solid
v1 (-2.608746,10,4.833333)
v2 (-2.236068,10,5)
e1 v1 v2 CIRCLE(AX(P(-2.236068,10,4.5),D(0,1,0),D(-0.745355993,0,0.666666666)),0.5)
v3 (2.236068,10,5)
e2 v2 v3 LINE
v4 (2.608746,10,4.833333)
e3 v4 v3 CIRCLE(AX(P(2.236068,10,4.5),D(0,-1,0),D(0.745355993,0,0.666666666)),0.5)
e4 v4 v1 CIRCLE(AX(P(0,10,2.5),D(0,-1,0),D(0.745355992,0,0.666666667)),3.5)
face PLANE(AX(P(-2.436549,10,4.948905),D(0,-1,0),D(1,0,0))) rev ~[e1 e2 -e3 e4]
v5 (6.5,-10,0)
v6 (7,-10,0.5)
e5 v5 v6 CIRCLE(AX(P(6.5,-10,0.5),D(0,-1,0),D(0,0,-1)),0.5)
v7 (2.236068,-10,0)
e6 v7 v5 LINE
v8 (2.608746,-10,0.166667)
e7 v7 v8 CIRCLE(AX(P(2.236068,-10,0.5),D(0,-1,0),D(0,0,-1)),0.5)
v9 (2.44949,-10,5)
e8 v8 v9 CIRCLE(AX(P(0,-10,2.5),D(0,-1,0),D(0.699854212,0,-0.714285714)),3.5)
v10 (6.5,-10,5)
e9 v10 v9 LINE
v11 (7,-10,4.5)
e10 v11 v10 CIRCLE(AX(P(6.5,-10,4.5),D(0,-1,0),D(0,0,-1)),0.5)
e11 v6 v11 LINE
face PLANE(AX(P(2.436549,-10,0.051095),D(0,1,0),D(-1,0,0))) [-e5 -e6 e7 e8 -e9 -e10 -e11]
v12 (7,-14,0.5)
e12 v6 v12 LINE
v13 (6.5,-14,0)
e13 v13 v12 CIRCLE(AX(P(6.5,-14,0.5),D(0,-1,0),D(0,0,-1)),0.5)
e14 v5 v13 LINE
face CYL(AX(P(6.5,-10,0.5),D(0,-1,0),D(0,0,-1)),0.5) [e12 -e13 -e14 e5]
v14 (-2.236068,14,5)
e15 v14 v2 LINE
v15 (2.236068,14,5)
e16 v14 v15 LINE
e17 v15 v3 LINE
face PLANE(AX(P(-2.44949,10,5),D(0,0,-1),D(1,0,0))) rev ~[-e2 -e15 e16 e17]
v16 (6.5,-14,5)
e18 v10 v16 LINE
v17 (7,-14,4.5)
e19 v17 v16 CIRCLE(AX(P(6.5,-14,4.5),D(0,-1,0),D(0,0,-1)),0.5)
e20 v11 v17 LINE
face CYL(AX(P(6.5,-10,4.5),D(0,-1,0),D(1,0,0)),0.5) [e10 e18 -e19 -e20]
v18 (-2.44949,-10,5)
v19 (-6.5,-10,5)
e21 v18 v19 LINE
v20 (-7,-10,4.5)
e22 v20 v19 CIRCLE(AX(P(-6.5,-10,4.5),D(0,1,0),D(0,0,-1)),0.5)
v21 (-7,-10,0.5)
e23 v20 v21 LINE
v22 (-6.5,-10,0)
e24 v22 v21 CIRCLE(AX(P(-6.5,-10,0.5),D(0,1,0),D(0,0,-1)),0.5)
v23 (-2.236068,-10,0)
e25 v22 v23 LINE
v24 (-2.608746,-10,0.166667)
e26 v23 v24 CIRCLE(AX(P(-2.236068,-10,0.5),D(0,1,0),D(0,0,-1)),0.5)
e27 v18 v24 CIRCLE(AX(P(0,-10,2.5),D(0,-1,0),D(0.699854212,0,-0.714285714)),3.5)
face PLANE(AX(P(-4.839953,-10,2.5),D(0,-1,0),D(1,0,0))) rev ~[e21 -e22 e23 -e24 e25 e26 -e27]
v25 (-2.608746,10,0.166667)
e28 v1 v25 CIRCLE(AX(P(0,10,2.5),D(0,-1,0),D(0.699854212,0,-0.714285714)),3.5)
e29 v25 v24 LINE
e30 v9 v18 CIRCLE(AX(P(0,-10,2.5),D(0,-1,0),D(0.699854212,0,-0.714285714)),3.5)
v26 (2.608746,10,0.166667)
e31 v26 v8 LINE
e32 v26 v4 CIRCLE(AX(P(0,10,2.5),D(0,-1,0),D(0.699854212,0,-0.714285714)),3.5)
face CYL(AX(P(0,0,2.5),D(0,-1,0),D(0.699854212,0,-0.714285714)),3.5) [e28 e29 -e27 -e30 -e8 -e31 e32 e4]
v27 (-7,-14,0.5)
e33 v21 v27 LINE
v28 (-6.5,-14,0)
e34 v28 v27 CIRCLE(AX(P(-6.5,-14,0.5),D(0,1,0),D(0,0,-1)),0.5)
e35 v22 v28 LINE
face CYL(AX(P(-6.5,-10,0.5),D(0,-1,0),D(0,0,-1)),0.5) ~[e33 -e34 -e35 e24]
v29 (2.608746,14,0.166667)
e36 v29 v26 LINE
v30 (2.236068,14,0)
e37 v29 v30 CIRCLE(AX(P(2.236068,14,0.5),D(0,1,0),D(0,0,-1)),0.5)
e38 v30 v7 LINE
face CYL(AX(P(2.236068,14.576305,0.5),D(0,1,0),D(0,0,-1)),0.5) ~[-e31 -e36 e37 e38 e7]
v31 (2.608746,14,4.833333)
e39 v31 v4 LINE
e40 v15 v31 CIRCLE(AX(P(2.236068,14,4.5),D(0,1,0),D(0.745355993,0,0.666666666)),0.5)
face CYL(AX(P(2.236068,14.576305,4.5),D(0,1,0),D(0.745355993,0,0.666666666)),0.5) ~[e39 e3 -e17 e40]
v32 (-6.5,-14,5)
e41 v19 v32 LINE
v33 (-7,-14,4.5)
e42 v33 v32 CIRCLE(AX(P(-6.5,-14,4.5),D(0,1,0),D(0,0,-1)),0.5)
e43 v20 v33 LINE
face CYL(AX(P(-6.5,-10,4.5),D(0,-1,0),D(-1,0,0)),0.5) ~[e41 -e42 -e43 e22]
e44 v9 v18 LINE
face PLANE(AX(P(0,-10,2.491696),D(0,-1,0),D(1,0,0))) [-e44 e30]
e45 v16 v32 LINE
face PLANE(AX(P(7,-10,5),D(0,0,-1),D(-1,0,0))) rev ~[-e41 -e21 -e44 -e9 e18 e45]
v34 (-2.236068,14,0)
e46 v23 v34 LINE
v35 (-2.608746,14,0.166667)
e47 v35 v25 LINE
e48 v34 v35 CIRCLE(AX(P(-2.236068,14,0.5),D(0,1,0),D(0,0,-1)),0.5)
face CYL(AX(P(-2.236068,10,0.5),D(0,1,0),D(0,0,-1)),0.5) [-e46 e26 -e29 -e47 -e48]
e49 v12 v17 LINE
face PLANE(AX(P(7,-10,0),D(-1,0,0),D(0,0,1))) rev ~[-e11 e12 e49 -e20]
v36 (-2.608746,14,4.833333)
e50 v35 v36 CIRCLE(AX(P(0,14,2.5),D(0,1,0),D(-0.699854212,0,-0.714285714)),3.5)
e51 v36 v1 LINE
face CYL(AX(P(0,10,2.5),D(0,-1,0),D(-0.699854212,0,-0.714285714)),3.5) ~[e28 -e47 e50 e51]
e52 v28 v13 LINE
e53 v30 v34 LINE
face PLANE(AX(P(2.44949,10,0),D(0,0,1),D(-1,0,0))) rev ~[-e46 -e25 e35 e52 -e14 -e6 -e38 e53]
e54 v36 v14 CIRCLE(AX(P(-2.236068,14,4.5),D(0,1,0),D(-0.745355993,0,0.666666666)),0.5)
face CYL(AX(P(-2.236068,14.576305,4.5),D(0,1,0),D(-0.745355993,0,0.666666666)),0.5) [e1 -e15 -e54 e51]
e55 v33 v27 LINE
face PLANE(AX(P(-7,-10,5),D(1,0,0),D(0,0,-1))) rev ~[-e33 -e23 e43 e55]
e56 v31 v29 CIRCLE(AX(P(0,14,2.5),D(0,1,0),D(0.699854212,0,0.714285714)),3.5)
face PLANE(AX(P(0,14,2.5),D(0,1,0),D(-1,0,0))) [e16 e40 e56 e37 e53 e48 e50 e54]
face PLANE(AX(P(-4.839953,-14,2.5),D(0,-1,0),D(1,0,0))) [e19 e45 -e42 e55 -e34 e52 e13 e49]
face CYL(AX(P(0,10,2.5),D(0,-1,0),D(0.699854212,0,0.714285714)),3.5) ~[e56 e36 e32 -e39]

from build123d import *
from build123d import SkipClean  # not in build123d's __all__

# Parameters (mm, degrees)
F1_DEPTH    = 10
F3_DEPTH    = 4
F5_DEPTH    = 4
F6_R        = 0.5
F7_T1_DEPTH = 20
F7_T3_DEPTH = 4.5763046334


# Not quite as in the source:
# - a fillet or chamfer that OpenCascade refuses, or shapes differently, is made with other operations: its cross-section is extruded or revolved along the edge and cut away or added


with BuildPart() as f1:
    # F0 (on Front) → F1 (new body, symmetric)
    with BuildSketch(Plane.XZ):
        with BuildLine():
            Line((-2.4494897428, 0), (2.4494897428, 0))
            ThreePointArc((2.4494897428, 0), (0, 6), (-2.4494897428, 0))
        make_face()
    extrude(amount=F1_DEPTH, both=True)

    # F2 (on face) → F3 (join)
    with BuildSketch(Plane.XZ.offset(10)):
        with BuildLine():
            Line((-2.4494897428, 5), (-7, 5))
            Line((-7, 5), (-7, 0))
            Line((-7, 0), (-2.4494897428, 0))
            ThreePointArc((-2.4494897428, 0), (-3.5, 2.5), (-2.4494897428, 5))
        make_face()
        with BuildLine():
            Line((2.4494897428, 5), (-2.4494897428, 5))
            ThreePointArc((-2.4494897428, 5), (-3.5, 2.5), (-2.4494897428, 0))
            Line((-2.4494897428, 0), (2.4494897428, 0))
            ThreePointArc((2.4494897428, 0), (3.5, 2.5), (2.4494897428, 5))
        make_face()
        with BuildLine():
            Line((7, 5), (2.4494897428, 5))
            ThreePointArc((2.4494897428, 5), (3.5, 2.5), (2.4494897428, 0))
            Line((2.4494897428, 0), (7, 0))
            Line((7, 0), (7, 5))
        make_face()
    extrude(amount=F3_DEPTH)

    # F4 (on face) → F5 (join)
    with BuildSketch(Plane(origin=(0, 10, 0), x_dir=(-1, 0, 0), z_dir=(0, 1, 0))):
        with BuildLine():
            ThreePointArc((-2.4494897428, 5), (-3.5, 2.5), (-2.4494897428, 0))
            Line((-2.4494897428, 0), (2.4494897428, 0))
            ThreePointArc((2.4494897428, 0), (3.5, 2.5), (2.4494897428, 5))
            Line((2.4494897428, 5), (-2.4494897428, 5))
        make_face()
    extrude(amount=F5_DEPTH)

    # F6
    f6_edges = [f1.edges().sort_by_distance(p)[0] for p in [
        (7, -12, 5),
        (7, -12, 0),
        (-7, -12, 5),
        (-7, -12, 0),
    ]]
    fillet(f6_edges, radius=F6_R)

    # F7: fillet of radius 0.5 on 6 edges, made by hand

    # F7_s2 → F7_t1 (cut)
    with BuildSketch(Plane.XZ.offset(-10)):
        with BuildLine():
            ThreePointArc((2.2360679775, 0), (2.4401921227, 0.0435645354), (2.6087459737, 0.1666666667))
            ThreePointArc((2.6087459737, 0.1666666667), (2.5304903844, 0.0820218333), (2.4494897428, 0))
            Line((2.4494897428, 0), (2.2360679775, 0))
        make_face()
        with BuildLine():
            ThreePointArc((-2.2360679775, 0), (-2.4401921227, 0.0435645354), (-2.6087459737, 0.1666666667))
            ThreePointArc((-2.6087459737, 0.1666666667), (-2.5304903844, 0.0820218333), (-2.4494897428, 0))
            Line((-2.4494897428, 0), (-2.2360679775, 0))
        make_face()
    with SkipClean():  # cleaning this boolean's faces spoils the solid; the shape is the same uncleaned
        extrude(amount=F7_T1_DEPTH, mode=Mode.SUBTRACT)

    # F7_s4 → F7_t3 (cut)
    with BuildSketch(Plane.XZ.offset(-14.5763046334)):
        with BuildLine():
            ThreePointArc((2.2360679775, 0), (2.4401921227, 0.0435645354), (2.6087459737, 0.1666666667))
            ThreePointArc((2.6087459737, 0.1666666667), (2.5304903844, 0.0820218333), (2.4494897428, 0))
            Line((2.4494897428, 0), (2.2360679775, 0))
        make_face()
        with BuildLine():
            ThreePointArc((-2.2360679775, 0), (-2.4401921227, 0.0435645354), (-2.6087459737, 0.1666666667))
            ThreePointArc((-2.6087459737, 0.1666666667), (-2.5304903844, 0.0820218333), (-2.4494897428, 0))
            Line((-2.4494897428, 0), (-2.2360679775, 0))
        make_face()
        with BuildLine():
            ThreePointArc((2.6087459737, 4.8333333333), (2.4401921227, 4.9564354646), (2.2360679775, 5))
            Line((2.2360679775, 5), (2.4494897428, 5))
            ThreePointArc((2.4494897428, 5), (2.5304903844, 4.9179781667), (2.6087459737, 4.8333333333))
        make_face()
        with BuildLine():
            ThreePointArc((-2.6087459737, 4.8333333333), (-2.4401921227, 4.9564354646), (-2.2360679775, 5))
            Line((-2.2360679775, 5), (-2.4494897428, 5))
            ThreePointArc((-2.4494897428, 5), (-2.5304903844, 4.9179781667), (-2.6087459737, 4.8333333333))
        make_face()
    extrude(amount=F7_T3_DEPTH, mode=Mode.SUBTRACT)


solid = f1.part
